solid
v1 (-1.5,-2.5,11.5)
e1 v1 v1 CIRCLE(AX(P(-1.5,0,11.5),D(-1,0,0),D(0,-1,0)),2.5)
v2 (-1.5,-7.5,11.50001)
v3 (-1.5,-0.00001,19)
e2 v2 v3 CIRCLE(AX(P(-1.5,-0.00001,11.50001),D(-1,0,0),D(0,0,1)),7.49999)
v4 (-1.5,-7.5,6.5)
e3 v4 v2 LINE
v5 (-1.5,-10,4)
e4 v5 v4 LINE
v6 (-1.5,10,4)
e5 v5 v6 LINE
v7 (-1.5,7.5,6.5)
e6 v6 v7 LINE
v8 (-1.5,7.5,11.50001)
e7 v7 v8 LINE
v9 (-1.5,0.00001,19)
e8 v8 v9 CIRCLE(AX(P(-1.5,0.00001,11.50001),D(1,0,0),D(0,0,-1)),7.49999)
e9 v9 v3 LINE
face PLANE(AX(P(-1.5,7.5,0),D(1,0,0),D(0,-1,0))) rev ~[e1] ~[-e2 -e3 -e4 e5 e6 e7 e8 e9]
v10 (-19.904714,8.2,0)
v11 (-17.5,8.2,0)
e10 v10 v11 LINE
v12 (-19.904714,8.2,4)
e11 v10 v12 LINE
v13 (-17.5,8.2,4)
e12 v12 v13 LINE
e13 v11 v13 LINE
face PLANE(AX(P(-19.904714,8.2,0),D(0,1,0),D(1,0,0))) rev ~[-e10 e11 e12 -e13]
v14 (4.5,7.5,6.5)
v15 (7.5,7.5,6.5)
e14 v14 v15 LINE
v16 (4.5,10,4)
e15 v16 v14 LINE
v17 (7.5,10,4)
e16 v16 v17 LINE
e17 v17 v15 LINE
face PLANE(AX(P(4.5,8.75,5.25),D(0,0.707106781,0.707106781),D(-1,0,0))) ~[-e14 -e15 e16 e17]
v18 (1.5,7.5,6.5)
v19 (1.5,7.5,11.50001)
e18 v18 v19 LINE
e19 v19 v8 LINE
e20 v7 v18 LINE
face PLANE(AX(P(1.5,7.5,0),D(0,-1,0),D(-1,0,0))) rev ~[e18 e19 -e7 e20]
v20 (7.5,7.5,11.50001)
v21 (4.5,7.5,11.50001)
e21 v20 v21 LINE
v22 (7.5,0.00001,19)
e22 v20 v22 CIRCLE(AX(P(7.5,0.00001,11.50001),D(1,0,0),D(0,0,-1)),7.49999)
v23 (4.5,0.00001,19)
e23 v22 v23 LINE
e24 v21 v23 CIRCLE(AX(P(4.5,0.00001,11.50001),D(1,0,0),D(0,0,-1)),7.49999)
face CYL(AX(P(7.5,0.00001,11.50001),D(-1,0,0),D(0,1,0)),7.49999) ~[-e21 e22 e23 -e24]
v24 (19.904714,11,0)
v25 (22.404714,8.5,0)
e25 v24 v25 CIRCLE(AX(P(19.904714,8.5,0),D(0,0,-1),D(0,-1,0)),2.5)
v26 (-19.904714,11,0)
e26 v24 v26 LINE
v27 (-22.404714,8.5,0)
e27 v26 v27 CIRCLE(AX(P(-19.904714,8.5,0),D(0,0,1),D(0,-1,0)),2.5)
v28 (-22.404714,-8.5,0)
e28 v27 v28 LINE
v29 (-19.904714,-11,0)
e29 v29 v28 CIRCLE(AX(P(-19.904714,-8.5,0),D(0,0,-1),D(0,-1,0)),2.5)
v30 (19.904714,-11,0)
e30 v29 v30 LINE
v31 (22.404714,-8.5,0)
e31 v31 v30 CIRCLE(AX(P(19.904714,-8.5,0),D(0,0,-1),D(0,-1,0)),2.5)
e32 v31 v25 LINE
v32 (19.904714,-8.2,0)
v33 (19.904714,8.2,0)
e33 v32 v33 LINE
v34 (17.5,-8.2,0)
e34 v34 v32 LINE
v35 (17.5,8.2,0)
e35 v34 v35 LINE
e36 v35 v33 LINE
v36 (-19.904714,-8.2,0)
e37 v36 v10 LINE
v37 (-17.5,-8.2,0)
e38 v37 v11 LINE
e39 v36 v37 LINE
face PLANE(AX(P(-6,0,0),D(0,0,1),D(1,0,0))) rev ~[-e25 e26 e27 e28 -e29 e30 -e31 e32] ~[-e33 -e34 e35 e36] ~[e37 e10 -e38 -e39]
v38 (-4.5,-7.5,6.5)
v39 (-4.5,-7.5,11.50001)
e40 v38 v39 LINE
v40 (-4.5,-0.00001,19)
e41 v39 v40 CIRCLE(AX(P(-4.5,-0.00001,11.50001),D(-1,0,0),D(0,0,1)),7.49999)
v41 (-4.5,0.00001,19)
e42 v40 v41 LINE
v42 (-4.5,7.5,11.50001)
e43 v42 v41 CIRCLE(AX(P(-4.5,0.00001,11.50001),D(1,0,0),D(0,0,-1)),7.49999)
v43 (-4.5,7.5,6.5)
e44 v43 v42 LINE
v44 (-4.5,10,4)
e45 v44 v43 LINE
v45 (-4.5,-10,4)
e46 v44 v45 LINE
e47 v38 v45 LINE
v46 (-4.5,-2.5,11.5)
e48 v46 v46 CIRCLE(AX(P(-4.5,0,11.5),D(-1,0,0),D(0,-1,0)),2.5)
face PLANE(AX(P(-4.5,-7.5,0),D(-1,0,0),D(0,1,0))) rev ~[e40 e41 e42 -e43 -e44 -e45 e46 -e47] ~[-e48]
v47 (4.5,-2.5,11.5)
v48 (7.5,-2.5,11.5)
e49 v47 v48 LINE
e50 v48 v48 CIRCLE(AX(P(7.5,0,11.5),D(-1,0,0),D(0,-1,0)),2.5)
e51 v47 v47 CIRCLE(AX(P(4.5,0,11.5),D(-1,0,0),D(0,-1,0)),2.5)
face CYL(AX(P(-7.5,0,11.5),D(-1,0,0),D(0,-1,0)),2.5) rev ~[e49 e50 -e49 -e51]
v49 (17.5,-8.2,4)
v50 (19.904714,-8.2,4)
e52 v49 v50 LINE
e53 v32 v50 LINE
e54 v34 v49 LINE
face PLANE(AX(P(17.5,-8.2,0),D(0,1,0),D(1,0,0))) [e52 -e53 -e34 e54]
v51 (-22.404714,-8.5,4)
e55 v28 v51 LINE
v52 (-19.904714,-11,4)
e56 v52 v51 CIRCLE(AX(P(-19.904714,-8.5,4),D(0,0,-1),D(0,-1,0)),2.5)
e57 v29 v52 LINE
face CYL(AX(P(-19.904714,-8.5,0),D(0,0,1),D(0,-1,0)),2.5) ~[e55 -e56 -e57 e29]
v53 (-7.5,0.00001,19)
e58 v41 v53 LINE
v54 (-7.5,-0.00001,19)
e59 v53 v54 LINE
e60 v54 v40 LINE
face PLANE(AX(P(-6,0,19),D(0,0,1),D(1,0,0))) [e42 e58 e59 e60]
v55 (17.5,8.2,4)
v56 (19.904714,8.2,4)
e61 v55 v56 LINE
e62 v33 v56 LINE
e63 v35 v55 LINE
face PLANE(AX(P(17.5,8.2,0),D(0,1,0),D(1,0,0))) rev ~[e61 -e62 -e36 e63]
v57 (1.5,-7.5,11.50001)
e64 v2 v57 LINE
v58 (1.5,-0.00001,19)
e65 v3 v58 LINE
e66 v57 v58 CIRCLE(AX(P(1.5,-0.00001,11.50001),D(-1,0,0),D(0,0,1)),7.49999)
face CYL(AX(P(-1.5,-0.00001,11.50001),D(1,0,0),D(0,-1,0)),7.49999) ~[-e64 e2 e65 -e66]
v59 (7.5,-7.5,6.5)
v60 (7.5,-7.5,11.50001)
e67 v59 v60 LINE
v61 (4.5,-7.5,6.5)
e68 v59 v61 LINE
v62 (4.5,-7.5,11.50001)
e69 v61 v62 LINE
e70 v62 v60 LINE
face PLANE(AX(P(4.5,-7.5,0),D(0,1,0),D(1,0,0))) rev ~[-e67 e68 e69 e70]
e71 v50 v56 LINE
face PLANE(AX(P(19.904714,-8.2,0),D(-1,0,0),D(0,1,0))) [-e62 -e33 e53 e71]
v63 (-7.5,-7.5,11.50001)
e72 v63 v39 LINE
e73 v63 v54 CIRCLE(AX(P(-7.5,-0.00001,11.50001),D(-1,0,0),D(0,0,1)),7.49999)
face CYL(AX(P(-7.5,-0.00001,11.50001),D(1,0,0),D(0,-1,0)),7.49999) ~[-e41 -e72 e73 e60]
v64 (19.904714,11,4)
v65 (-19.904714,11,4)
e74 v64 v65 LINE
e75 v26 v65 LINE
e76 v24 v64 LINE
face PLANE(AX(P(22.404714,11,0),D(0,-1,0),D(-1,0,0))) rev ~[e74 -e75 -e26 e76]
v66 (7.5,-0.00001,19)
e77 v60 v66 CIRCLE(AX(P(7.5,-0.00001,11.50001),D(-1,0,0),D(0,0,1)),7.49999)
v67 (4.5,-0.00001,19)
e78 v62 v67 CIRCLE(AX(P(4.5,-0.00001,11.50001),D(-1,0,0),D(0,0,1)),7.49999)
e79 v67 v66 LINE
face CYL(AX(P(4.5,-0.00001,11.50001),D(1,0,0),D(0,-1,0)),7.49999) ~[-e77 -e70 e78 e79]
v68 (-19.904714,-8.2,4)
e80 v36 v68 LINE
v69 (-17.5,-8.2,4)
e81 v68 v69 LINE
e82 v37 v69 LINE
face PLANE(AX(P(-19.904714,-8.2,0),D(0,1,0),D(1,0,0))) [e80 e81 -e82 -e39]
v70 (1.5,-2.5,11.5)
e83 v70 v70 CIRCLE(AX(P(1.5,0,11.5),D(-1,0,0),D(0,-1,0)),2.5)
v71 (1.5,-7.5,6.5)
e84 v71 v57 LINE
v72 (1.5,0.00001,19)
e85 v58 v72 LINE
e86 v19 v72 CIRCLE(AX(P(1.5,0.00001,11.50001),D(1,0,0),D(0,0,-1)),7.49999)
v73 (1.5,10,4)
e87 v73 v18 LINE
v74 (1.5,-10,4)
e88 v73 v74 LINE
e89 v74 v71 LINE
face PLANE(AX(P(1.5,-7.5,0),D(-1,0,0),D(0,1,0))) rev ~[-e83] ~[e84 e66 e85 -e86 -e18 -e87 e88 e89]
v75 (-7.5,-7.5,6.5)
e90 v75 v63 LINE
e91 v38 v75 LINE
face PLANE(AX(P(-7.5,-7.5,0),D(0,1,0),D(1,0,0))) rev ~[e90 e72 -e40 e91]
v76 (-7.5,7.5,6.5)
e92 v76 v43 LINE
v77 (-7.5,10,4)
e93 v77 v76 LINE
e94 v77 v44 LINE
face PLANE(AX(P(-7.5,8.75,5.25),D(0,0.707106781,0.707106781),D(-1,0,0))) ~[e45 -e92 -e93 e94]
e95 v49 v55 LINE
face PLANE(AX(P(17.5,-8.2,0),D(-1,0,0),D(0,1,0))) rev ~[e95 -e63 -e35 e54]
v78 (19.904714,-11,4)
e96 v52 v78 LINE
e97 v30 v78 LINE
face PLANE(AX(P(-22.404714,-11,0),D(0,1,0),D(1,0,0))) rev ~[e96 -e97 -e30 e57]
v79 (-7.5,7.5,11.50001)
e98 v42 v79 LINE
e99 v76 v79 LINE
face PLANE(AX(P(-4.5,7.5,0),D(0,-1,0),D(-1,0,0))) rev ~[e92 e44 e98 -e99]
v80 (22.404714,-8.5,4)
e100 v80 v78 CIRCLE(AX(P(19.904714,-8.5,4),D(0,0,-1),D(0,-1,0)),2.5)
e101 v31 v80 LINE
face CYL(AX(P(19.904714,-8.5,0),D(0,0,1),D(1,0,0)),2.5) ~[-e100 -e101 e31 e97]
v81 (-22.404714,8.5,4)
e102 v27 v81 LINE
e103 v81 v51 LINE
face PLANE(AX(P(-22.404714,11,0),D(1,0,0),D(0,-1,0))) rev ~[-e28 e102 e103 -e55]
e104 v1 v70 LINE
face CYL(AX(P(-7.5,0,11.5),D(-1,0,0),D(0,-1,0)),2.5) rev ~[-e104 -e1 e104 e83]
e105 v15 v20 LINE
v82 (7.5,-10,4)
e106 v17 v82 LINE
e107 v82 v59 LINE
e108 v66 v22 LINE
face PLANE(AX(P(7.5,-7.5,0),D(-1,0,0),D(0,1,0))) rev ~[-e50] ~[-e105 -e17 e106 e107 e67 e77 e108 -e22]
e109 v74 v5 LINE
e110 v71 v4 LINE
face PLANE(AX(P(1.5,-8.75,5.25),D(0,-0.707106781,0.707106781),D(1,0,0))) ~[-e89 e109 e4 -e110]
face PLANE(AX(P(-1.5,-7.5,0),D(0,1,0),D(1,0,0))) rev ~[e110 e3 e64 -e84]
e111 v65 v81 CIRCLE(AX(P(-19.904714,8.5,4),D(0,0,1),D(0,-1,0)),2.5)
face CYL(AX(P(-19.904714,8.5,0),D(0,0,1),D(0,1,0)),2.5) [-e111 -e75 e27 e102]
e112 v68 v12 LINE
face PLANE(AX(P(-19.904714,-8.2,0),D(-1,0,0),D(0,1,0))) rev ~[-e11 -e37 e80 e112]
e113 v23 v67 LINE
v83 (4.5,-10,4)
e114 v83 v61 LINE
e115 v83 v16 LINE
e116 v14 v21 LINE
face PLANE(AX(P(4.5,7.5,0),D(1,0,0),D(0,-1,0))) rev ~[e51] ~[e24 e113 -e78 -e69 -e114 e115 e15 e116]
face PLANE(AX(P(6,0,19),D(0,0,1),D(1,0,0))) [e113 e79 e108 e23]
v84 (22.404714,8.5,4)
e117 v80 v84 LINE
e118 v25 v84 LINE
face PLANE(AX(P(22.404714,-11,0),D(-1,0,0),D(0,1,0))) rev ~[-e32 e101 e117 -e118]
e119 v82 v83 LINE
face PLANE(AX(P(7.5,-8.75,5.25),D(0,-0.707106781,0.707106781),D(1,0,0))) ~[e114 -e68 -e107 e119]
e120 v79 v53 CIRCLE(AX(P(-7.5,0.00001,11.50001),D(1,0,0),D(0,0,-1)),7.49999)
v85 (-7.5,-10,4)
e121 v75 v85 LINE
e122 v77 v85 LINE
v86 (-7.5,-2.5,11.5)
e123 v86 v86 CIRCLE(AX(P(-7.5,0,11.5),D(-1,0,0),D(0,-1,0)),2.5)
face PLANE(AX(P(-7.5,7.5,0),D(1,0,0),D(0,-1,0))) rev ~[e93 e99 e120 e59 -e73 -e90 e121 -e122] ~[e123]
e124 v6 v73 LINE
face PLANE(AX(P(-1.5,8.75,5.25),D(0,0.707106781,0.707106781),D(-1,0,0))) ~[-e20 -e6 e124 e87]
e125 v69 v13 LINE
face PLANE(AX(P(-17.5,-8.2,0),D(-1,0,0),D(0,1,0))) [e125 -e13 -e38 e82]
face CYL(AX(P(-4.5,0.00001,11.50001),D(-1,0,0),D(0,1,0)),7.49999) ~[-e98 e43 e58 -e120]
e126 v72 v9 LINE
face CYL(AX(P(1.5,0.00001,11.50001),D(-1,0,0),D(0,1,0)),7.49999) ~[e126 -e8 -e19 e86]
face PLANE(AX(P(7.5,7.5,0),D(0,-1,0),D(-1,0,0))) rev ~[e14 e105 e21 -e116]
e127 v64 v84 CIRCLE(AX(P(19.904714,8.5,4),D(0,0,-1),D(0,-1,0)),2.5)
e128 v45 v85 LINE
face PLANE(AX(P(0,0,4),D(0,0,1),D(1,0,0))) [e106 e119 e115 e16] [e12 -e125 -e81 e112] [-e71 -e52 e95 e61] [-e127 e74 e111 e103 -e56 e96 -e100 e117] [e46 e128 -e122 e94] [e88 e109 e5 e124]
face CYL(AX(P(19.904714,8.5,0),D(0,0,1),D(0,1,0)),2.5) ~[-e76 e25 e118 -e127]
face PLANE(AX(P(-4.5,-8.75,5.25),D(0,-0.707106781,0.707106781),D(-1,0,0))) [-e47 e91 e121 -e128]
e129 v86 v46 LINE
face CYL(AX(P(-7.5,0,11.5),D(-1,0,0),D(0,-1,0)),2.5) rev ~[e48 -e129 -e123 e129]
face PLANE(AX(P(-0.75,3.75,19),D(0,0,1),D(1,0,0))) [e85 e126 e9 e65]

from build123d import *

# Parameters (mm, degrees)
F0_W     = 2.4047140032
F0_H     = 16.4
F0_W_2   = 3
F0_H_2   = 7.5
F0_W_3   = 1.5
F1_DEPTH = 4
F2_DEPTH = 19
F3_R     = 7.49999
F4_R     = 2.5
F5_DEPTH = 29.9057140032
F6_SIZE  = 2.5
F7_R     = 2.5


# Not quite as in the source:
# - a fillet or chamfer is up to 0.001 mm smaller than in the source, because OpenCascade refuses the exact size
# - a feature names something its author has since deleted; it is built from what else it names


with BuildPart() as f1:
    # F0 (on Top) → F1 (new body)
    with BuildSketch(Plane.XY):
        Polygon((-5.6430239742, 11), (-22.4047140032, 11), (-22.4047140032, -11), (22.4047140032, -11), (22.4047140032, 11), (5.6430239742, 11), (0, 11), align=None)
        with Locations((-18.7023570016, 0)):
            Rectangle(F0_W, F0_H, mode=Mode.SUBTRACT)
        Polygon((-1.5, 7.5), (0, 7.5), (1.5, 7.5), (4.5, 7.5), (7.5, 7.5), (7.5, -7.5), (4.5, -7.5), (4.5, 0), (1.5, 0), (1.5, -7.5), (-1.5, -7.5), (-1.5, 0), (-4.5, 0), (-4.5, -7.5), (-7.5, -7.5), (-7.5, 7.5), (-4.5, 7.5), align=None, mode=Mode.SUBTRACT)
        with Locations((18.7023570016, 0)):
            Rectangle(F0_W, F0_H, mode=Mode.SUBTRACT)
        Polygon((-4.5, 0), (-4.5, 7.5), (-7.5, 7.5), (-7.5, -7.5), (-4.5, -7.5), align=None)
        with Locations((-3, 3.75)):
            Rectangle(F0_W_2, F0_H_2)
        with Locations((-0.75, 3.75)):
            Rectangle(F0_W_3, F0_H_2)
        with Locations((0.75, 3.75)):
            Rectangle(F0_W_3, F0_H_2)
        Polygon((1.5, 0), (0, 0), (-1.5, 0), (-1.5, -7.5), (1.5, -7.5), align=None)
        with Locations((3, 3.75)):
            Rectangle(F0_W_2, F0_H_2)
        Polygon((7.5, 7.5), (4.5, 7.5), (4.5, 0), (4.5, -7.5), (7.5, -7.5), align=None)
    extrude(amount=F1_DEPTH)

    # F0 (on Top) → F2 (join)
    with BuildSketch(Plane.XY):
        Polygon((-4.5, 0), (-4.5, 7.5), (-7.5, 7.5), (-7.5, -7.5), (-4.5, -7.5), align=None)
        with Locations((-0.75, 3.75)):
            Rectangle(F0_W_3, F0_H_2)
        with Locations((0.75, 3.75)):
            Rectangle(F0_W_3, F0_H_2)
        Polygon((1.5, 0), (0, 0), (-1.5, 0), (-1.5, -7.5), (1.5, -7.5), align=None)
        Polygon((7.5, 7.5), (4.5, 7.5), (4.5, 0), (4.5, -7.5), (7.5, -7.5), align=None)
    extrude(amount=F2_DEPTH)

    # F3 (radius 7.5 in the source; OpenCascade refuses exactly that, so slightly less here)
    f3_edges = [f1.edges().sort_by_distance(p)[0] for p in [
        (-6, -7.5, 19),
        (0, -7.5, 19),
        (6, -7.5, 19),
        (6, 7.5, 19),
        (0, 7.5, 19),
        (-6, 7.5, 19),
    ]]
    fillet(f3_edges, radius=F3_R)

    # F4 (on face) → F5 (cut, through all)
    with BuildSketch(Plane(origin=(-7.5, 0, 0), x_dir=(0, -1, 0), z_dir=(-1, 0, 0))):
        with Locations((0, 11.5)):
            Circle(F4_R)
    extrude(amount=-F5_DEPTH, mode=Mode.SUBTRACT)

    # F6
    f6_edges = [f1.edges().sort_by_distance(p)[0] for p in [
        (-6, 7.5, 4),
        (0, 7.5, 4),
        (6, 7.5, 4),
        (-6, -7.5, 4),
        (0, -7.5, 4),
        (6, -7.5, 4),
    ]]
    chamfer(f6_edges, length=F6_SIZE)

    # F7
    f7_edges = [f1.edges().sort_by_distance(p)[0] for p in [
        (-22.404714, 11, 2),
        (-22.404714, -11, 2),
        (22.404714, -11, 2),
        (22.404714, 11, 2),
    ]]
    fillet(f7_edges, radius=F7_R)


solid = f1.part
